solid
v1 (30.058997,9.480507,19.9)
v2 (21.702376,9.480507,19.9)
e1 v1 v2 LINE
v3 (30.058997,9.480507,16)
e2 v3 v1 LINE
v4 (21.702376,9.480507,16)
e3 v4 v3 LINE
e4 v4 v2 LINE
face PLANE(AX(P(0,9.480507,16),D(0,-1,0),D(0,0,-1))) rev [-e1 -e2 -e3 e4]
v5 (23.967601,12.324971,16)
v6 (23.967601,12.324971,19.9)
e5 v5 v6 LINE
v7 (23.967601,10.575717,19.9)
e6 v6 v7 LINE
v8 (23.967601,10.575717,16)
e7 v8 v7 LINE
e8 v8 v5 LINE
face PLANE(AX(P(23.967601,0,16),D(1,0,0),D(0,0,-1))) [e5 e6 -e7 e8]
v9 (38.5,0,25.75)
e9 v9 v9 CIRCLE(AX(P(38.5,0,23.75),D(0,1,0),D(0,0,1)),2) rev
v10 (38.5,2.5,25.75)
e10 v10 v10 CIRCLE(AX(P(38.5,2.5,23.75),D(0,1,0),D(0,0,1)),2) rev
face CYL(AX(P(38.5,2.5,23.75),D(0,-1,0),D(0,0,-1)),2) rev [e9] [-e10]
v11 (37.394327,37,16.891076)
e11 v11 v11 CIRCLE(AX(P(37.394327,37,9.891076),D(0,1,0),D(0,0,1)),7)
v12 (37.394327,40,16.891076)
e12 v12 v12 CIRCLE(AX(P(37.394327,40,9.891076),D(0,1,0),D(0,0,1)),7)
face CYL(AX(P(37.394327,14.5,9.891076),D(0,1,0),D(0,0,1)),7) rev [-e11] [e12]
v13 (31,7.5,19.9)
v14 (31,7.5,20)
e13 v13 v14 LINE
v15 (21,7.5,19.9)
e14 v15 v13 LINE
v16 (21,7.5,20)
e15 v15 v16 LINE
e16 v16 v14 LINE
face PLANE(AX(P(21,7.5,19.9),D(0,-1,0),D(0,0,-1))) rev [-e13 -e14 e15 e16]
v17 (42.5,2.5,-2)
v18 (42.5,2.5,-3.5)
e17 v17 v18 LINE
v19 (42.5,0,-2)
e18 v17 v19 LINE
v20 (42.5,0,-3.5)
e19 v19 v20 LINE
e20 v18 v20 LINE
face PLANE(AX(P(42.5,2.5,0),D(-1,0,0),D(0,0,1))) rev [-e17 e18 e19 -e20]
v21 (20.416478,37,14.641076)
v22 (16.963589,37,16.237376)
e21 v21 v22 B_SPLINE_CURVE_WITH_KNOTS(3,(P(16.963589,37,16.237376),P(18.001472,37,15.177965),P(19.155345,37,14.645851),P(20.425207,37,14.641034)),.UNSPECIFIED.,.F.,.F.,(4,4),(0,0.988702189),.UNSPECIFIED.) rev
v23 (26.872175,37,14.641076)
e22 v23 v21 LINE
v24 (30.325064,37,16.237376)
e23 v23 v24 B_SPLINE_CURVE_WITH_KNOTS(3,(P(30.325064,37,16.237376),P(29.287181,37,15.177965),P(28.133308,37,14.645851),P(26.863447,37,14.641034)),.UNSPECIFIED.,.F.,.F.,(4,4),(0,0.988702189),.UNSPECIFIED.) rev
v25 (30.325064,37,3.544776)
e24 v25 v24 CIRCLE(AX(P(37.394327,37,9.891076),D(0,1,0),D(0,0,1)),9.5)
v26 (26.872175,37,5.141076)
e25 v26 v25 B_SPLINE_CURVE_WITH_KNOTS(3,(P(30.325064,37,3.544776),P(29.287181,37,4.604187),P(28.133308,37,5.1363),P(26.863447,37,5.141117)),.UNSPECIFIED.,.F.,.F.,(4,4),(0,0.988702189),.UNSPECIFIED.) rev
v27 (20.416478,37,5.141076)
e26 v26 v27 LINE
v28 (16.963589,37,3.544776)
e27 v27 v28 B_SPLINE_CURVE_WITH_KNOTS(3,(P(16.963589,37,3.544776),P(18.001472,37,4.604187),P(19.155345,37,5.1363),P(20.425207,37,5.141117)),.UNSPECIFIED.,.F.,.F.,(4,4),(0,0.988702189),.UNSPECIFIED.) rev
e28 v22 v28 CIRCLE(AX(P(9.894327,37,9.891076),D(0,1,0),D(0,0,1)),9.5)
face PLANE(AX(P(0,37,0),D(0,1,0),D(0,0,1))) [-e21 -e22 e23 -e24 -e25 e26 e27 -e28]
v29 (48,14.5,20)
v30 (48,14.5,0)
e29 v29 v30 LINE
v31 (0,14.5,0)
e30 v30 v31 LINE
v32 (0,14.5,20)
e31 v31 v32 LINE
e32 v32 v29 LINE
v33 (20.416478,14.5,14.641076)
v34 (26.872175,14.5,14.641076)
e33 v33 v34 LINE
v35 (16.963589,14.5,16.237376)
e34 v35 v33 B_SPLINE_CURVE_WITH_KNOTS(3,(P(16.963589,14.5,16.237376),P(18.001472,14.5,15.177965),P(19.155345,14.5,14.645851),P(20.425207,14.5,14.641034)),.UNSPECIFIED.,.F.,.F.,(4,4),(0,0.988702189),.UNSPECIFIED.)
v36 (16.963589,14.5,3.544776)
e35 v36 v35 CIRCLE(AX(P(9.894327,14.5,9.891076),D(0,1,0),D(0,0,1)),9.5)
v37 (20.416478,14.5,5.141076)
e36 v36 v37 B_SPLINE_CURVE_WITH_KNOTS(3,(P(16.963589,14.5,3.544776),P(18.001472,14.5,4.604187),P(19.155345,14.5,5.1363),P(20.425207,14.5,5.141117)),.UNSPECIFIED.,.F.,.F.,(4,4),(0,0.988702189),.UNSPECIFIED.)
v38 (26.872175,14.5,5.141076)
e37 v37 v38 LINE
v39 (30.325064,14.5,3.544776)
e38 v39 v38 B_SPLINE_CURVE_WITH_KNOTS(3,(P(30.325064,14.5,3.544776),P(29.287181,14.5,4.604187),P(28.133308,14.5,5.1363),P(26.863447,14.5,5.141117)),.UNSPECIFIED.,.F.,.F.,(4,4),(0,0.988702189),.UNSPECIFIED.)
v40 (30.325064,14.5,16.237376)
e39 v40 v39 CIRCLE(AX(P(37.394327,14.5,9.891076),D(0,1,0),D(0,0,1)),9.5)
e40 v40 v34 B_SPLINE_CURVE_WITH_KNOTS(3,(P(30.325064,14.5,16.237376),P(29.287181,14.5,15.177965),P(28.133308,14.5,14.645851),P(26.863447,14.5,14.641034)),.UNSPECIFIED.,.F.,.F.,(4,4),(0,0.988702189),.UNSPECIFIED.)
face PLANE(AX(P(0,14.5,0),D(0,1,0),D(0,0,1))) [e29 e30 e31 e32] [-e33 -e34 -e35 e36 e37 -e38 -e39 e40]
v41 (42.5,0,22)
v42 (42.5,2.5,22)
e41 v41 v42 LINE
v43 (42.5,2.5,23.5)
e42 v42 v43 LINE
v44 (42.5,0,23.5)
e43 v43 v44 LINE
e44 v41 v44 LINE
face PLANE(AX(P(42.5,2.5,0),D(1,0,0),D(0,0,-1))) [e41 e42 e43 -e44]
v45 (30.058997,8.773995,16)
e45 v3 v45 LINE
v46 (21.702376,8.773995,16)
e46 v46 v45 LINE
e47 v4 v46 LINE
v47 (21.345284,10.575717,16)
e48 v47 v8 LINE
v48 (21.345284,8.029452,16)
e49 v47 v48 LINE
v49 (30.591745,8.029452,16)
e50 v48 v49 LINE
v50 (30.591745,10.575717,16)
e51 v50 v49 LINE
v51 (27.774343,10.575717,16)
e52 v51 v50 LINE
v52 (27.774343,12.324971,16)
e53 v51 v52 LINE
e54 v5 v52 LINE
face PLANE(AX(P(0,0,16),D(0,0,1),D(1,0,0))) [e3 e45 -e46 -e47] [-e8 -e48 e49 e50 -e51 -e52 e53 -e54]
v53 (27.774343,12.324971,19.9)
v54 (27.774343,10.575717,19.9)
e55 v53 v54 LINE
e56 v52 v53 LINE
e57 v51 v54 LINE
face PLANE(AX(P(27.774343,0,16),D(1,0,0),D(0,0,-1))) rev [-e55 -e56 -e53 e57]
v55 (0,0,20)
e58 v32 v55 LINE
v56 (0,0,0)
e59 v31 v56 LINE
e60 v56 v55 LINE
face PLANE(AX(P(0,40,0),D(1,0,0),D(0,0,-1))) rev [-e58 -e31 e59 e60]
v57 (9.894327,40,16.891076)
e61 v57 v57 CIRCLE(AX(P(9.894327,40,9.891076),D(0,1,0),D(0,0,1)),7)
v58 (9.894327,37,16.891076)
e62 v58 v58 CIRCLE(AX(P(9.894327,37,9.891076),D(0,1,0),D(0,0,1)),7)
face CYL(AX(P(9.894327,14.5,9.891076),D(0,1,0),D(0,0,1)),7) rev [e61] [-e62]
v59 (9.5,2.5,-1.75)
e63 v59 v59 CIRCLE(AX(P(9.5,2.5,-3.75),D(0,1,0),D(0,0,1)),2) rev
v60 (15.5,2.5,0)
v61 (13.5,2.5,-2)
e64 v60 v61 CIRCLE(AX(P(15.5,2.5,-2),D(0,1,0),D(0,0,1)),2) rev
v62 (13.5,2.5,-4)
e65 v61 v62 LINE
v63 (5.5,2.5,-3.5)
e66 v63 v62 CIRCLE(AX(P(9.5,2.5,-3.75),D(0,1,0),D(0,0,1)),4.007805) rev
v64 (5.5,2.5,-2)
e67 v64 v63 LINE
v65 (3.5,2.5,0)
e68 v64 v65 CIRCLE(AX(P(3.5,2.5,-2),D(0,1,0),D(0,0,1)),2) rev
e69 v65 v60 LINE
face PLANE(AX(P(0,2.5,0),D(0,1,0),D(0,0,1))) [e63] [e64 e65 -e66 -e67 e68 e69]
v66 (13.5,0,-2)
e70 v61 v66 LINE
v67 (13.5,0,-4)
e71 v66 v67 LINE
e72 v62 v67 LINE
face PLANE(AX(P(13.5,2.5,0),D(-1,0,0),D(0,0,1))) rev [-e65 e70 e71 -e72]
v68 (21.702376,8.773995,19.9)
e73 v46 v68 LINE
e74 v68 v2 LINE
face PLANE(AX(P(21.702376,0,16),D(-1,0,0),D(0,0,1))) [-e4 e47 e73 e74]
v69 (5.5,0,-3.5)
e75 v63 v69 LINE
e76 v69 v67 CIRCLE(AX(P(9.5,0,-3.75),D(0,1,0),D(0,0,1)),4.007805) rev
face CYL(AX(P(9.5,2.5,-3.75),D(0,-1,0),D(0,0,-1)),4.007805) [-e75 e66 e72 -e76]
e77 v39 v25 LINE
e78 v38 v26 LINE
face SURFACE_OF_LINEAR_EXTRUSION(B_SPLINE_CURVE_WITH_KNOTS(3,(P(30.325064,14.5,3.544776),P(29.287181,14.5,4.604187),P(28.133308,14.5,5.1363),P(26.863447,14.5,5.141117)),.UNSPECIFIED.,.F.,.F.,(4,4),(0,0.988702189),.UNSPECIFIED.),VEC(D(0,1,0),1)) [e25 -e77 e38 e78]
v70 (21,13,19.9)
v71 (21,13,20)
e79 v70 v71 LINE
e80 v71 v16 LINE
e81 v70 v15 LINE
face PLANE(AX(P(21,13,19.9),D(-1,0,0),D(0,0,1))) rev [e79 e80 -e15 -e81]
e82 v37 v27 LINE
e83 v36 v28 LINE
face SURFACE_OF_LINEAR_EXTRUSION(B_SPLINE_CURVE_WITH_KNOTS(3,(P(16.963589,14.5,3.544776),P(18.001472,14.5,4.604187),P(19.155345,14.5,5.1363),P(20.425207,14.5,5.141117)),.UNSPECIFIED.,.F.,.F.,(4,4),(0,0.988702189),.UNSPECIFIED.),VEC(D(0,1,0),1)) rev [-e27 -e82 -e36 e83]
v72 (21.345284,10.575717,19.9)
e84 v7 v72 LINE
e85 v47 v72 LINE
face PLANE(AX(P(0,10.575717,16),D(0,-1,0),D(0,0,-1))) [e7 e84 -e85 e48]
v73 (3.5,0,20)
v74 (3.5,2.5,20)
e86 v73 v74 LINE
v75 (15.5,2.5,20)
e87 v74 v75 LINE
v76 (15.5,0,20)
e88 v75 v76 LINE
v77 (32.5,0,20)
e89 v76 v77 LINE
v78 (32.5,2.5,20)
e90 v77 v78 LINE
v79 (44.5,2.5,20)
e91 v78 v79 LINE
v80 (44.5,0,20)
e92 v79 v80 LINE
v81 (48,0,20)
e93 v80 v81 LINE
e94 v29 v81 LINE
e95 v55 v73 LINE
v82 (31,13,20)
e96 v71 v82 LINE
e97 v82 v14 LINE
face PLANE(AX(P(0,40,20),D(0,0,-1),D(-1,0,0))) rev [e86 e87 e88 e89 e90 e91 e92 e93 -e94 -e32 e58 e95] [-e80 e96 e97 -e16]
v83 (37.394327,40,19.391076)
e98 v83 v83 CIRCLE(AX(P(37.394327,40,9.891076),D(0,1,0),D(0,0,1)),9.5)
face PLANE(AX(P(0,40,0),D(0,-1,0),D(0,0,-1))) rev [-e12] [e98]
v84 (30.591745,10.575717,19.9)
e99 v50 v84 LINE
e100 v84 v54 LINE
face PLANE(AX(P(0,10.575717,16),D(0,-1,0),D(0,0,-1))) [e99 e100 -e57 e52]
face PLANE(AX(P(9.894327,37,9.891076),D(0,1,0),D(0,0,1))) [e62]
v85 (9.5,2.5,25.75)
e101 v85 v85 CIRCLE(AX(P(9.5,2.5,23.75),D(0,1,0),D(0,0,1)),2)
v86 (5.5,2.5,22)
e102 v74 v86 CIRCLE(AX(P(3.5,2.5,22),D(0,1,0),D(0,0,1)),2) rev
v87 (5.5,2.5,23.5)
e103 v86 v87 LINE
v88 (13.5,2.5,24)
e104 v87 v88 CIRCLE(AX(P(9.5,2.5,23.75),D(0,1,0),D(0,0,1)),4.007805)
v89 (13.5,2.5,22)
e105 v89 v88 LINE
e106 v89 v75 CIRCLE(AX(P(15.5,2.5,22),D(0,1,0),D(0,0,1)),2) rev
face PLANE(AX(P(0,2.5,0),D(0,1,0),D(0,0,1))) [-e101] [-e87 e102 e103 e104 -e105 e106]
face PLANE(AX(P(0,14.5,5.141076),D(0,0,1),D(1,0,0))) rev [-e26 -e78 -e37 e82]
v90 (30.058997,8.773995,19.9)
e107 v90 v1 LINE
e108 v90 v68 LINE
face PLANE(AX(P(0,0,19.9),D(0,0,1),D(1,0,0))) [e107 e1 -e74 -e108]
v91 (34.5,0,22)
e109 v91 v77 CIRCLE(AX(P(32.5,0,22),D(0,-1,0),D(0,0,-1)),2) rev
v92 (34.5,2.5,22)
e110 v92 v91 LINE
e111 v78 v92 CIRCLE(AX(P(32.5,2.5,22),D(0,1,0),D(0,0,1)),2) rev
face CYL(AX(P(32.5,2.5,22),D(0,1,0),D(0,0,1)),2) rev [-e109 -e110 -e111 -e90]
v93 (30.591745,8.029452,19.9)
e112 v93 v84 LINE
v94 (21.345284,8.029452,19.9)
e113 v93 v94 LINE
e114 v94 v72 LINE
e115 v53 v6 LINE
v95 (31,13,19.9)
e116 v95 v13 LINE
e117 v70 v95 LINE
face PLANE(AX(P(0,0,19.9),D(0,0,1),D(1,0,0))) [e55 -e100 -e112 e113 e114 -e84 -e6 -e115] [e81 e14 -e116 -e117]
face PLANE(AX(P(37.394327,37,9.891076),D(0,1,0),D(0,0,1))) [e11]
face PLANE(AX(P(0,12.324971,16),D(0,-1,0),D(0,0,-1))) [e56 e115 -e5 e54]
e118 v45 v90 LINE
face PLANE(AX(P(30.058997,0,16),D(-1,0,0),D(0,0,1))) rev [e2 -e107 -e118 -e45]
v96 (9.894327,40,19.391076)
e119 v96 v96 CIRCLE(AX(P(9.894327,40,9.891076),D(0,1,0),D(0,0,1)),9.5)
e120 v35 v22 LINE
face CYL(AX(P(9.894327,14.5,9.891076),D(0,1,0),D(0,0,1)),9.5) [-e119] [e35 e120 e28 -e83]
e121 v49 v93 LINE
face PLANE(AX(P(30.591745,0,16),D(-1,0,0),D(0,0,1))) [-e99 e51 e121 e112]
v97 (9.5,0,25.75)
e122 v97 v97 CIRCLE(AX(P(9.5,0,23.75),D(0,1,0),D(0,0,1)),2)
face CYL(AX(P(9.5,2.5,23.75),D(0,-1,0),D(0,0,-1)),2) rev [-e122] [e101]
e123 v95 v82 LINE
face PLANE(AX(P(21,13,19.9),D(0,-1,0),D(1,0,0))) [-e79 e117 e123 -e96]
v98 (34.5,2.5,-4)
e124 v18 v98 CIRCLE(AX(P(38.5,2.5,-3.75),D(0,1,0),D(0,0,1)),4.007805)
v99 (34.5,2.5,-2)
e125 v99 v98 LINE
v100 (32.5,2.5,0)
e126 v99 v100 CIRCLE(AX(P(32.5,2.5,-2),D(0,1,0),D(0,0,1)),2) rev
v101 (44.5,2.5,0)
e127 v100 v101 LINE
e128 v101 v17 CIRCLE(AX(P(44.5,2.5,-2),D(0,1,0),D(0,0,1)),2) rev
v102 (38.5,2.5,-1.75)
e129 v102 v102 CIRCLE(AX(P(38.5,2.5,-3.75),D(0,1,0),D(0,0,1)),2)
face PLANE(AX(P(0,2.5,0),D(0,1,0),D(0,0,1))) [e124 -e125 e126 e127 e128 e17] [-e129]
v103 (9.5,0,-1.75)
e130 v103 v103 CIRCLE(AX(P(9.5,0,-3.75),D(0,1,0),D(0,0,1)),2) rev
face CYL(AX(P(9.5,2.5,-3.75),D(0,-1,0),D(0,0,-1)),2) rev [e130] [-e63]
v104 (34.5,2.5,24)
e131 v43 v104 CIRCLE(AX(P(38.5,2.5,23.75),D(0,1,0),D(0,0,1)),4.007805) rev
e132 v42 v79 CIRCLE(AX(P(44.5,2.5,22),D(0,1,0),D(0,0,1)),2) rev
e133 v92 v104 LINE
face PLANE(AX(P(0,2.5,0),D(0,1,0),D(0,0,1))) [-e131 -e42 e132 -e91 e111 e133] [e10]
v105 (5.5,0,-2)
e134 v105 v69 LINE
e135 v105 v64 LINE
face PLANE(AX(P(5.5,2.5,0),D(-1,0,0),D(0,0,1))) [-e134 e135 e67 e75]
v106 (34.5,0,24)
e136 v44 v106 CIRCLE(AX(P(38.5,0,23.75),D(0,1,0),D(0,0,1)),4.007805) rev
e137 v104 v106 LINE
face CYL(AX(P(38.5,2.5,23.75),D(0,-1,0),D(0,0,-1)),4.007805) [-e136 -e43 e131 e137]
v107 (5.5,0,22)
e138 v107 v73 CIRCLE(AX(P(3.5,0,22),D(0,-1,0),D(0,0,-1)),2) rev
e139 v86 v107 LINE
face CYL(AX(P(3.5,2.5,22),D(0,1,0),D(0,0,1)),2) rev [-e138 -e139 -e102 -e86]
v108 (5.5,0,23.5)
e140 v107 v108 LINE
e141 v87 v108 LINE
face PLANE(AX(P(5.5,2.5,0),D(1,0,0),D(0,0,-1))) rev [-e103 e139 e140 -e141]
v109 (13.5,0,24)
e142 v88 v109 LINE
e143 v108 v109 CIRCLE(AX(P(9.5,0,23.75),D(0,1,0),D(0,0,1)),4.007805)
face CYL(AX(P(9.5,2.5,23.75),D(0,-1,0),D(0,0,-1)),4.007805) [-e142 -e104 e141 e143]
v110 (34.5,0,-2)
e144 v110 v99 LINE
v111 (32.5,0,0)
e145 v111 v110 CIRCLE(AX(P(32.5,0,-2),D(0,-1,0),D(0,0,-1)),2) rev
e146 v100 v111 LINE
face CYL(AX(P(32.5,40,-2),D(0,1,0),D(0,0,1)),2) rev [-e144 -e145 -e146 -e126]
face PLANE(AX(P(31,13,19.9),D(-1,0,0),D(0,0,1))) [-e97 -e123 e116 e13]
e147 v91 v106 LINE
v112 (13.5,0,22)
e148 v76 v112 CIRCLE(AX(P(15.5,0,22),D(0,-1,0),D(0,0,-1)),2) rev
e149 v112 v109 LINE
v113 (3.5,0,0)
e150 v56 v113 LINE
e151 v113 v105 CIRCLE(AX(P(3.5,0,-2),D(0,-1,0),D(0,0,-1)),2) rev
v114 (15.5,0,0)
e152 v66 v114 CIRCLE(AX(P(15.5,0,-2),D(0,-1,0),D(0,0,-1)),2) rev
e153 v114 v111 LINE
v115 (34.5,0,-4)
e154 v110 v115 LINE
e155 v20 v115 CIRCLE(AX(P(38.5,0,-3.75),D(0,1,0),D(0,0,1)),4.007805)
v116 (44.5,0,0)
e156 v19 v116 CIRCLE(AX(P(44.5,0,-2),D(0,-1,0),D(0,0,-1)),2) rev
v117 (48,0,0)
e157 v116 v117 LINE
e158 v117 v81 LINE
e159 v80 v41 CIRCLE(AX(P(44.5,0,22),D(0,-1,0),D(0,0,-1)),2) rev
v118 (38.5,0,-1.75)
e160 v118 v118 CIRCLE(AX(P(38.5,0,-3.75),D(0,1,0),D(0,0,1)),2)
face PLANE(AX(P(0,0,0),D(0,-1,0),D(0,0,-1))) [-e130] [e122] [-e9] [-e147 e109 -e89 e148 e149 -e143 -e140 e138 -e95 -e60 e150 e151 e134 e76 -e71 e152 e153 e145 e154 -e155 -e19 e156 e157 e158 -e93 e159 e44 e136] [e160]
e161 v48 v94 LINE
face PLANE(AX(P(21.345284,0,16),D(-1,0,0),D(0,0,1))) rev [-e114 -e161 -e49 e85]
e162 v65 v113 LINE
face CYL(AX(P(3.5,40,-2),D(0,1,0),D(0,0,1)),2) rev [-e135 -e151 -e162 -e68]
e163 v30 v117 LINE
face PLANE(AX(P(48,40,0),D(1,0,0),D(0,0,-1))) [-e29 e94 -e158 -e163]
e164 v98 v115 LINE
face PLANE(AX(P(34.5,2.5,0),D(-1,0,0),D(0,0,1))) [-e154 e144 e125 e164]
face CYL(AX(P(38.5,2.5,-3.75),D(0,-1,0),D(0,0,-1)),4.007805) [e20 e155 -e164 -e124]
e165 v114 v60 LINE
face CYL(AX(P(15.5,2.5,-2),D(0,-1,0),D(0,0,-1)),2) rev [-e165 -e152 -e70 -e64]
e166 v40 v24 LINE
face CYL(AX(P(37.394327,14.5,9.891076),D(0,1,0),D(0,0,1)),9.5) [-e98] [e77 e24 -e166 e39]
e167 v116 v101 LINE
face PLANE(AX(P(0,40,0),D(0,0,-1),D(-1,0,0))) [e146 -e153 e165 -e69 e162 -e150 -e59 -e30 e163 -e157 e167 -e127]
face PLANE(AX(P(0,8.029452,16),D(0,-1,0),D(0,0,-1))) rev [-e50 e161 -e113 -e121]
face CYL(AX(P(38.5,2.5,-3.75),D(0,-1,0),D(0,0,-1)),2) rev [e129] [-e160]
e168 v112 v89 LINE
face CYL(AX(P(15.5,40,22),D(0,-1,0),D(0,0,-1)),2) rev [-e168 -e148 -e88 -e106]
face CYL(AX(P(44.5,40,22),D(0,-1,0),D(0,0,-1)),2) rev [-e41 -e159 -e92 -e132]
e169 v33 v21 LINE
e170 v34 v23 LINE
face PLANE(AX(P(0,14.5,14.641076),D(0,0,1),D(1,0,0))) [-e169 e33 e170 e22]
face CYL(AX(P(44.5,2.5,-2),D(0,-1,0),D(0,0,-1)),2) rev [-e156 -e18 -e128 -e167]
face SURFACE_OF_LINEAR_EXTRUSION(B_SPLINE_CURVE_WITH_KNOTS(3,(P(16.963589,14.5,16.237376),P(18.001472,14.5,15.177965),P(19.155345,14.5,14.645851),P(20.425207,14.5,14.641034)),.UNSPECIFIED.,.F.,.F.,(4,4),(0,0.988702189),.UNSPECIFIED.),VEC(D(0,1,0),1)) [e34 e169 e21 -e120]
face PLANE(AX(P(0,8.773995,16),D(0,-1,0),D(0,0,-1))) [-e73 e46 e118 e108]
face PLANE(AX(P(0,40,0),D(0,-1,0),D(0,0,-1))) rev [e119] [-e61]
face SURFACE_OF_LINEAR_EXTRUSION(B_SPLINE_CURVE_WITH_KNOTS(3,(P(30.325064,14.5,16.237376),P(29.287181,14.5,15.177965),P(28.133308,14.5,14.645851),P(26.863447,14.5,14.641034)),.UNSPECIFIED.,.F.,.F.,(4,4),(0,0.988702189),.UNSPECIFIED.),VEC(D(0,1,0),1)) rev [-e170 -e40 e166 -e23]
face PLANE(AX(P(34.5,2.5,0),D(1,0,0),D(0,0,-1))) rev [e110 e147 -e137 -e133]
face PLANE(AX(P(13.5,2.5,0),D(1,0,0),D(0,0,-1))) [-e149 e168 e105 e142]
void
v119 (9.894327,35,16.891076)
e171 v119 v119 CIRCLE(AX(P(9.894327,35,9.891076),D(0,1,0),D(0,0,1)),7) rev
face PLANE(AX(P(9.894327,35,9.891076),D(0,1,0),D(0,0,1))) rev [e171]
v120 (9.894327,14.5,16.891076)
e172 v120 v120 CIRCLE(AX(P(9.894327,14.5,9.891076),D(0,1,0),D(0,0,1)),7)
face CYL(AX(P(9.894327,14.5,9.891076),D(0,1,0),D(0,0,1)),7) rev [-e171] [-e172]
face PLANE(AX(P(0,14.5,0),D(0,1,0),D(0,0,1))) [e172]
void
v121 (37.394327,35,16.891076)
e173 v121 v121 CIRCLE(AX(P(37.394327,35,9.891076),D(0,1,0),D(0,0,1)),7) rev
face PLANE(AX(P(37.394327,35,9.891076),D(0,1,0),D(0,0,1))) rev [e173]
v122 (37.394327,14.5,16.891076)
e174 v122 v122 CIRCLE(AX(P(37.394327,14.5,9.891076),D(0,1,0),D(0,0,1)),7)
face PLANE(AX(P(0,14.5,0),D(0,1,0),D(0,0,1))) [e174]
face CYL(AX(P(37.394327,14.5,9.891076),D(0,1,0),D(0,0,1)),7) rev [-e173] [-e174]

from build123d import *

# Parameters (mm, degrees)
ESQUISSE1_W                 = 48
ESQUISSE1_H                 = 20
BOSS_EXTRU_2_DEPTH          = 40
ESQUISSE1_3_R               = 2
BOSS_EXTRU_4_DEPTH          = 2.5
CONG_1_R                    = 2
ENL_V_START                 = -25.5
ENL_V_MAT_EXTRU_2_OUTLINE_W = 48
ENL_V_MAT_EXTRU_2_OUTLINE_H = 20
ENL_V_MAT_EXTRU_2_DEPTH     = 25.5
ENL_V_START_2               = -3
ENL_V_MAT_EXTRU_3_DEPTH     = 3
ESQUISSE3_5_R               = 7
ENL_V_MAT_EXTRU_4_DEPTH     = 25.5
ESQUISSE8_R                 = 7
BOSS_EXTRU_5_DEPTH          = 2
ESQUISSE9_W                 = 3.806741441
ESQUISSE9_H                 = 1.749254543
ENL_V_MAT_EXTRU_5_DEPTH     = 4
ESQUISSE9_3_W               = 9.246461273
ESQUISSE9_3_H               = 2.546264857
ESQUISSE9_3_W_2             = 8.356621676
ESQUISSE9_3_H_2             = 0.706512752
ENL_V_MAT_EXTRU_6_DEPTH     = 4
ESQUISSE9_5_W               = 10
ESQUISSE9_5_H               = 5.5
ENL_V_MAT_EXTRU_7_DEPTH     = 0.1


# Read off the part's stored shape, not the designer's step: Enlèv. mat.-Extru.2, Enlèv. mat.-Extru.3
with BuildPart() as part:
    # Esquisse1 → Boss.-Extru.2 (new body)
    with BuildSketch(Plane(origin=(0, 0, 0), x_dir=(1, 0, 0), z_dir=(0, 1, 0))):
        with Locations((24, -10)):
            Rectangle(ESQUISSE1_W, ESQUISSE1_H)
    extrude(amount=BOSS_EXTRU_2_DEPTH)

    # Esquisse1<3> → Boss.-Extru.4 (add)
    # profile 1 of 4: a face of its own
    with BuildSketch(Plane(origin=(0, 0, 0), x_dir=(1, 0, 0), z_dir=(0, 1, 0))):
        with BuildLine():
            Line((13.5, -20), (5.5, -20))
            Line((5.5, -20), (5.5, -23.5))
            ThreePointArc((5.5, -23.5), (9.25, -27.75), (13.5, -24))
            Line((13.5, -24), (13.5, -20))
        make_face()
        with Locations(Location((9.5, -23.75, 0), (0, 0, 270))):
            Circle(ESQUISSE1_3_R, mode=Mode.SUBTRACT)
    # profile 2 of 4: a face of its own
    with BuildSketch(Plane(origin=(0, 0, 0), x_dir=(1, 0, 0), z_dir=(0, 1, 0))):
        with BuildLine():
            Line((42.5, -20), (34.5, -20))
            Line((34.5, -20), (34.5, -24))
            ThreePointArc((34.5, -24), (38.75, -27.75), (42.5, -23.5))
            Line((42.5, -23.5), (42.5, -20))
        make_face()
        with Locations(Location((38.5, -23.75, 0), (0, 0, 270))):
            Circle(ESQUISSE1_3_R, mode=Mode.SUBTRACT)
    # profile 3 of 4: a face of its own
    with BuildSketch(Plane(origin=(0, 0, 0), x_dir=(1, 0, 0), z_dir=(0, 1, 0))):
        with BuildLine():
            Line((5.5, 3.5), (5.5, 0))
            Line((5.5, 0), (13.5, 0))
            Line((13.5, 0), (13.5, 4))
            ThreePointArc((13.5, 4), (9.25, 7.75), (5.5, 3.5))
        make_face()
        with Locations(Location((9.5, 3.75, 0), (0, 0, 270))):
            Circle(ESQUISSE1_3_R, mode=Mode.SUBTRACT)
    # profile 4 of 4: a face of its own
    with BuildSketch(Plane(origin=(0, 0, 0), x_dir=(1, 0, 0), z_dir=(0, 1, 0))):
        with BuildLine():
            Line((34.5, 4), (34.5, 0))
            Line((34.5, 0), (42.5, 0))
            Line((42.5, 0), (42.5, 3.5))
            ThreePointArc((42.5, 3.5), (38.75, 7.75), (34.5, 4))
        make_face()
        with Locations(Location((38.5, 3.75, 0), (0, 0, 270))):
            Circle(ESQUISSE1_3_R, mode=Mode.SUBTRACT)
    extrude(amount=BOSS_EXTRU_4_DEPTH)

    # Congé1
    cong_1_edges = [part.edges().sort_by_distance(p)[0] for p in [
        (42.5, 1.25, 0),
        (34.5, 1.25, 0),
        (13.5, 1.25, 0),
        (5.5, 1.25, 0),
        (34.5, 1.25, 20),
        (42.5, 1.25, 20),
        (13.5, 1.25, 20),
        (5.5, 1.25, 20),
    ]]
    fillet(cong_1_edges, radius=CONG_1_R)

    # Enlèv. mat.-Extru.2 outline → Enlèv. mat.-Extru.2 (cut)
    with BuildSketch(Plane(origin=(0, 40, 0), x_dir=(1, 0, 0), z_dir=(0, 1, 0)).offset(ENL_V_START)):
        with Locations((24, -10)):
            Rectangle(ENL_V_MAT_EXTRU_2_OUTLINE_W, ENL_V_MAT_EXTRU_2_OUTLINE_H)
        with BuildLine():
            add(Edge.make_bspline(
                [(16.963589169, -16.237376104), (17.999093762, -15.180393065), (19.150056624, -14.648292989), (20.416477791, -14.641075876)],
                knots=[0, 0, 0, 0, 0.986436325, 0.986436325, 0.986436325, 0.986436325], degree=3))
            ThreePointArc((16.963589169, -16.237376104), (0.394326585, -9.891075881), (16.963589169, -3.544775658))
            add(Edge.make_bspline(
                [(16.963589169, -3.544775658), (17.999093762, -4.601758697), (19.150056624, -5.133858773), (20.416477791, -5.141075886)],
                knots=[0, 0, 0, 0, 0.986436325, 0.986436325, 0.986436325, 0.986436325], degree=3))
            Line((20.416477791, -5.141075886), (26.872175379, -5.141075886))
            add(Edge.make_bspline(
                [(30.325064001, -3.544775658), (29.289559409, -4.601758697), (28.138596547, -5.133858773), (26.872175379, -5.141075886)],
                knots=[0, 0, 0, 0, 0.986436325, 0.986436325, 0.986436325, 0.986436325], degree=3))
            ThreePointArc((30.325064001, -3.544775658), (46.894326585, -9.891075881), (30.325064001, -16.237376104))
            add(Edge.make_bspline(
                [(30.325064001, -16.237376104), (29.289559409, -15.180393065), (28.138596547, -14.648292989), (26.872175379, -14.641075876)],
                knots=[0, 0, 0, 0, 0.986436325, 0.986436325, 0.986436325, 0.986436325], degree=3))
            Line((26.872175379, -14.641075876), (20.416477791, -14.641075876))
        make_face(mode=Mode.SUBTRACT)
    extrude(amount=ENL_V_MAT_EXTRU_2_DEPTH, mode=Mode.SUBTRACT)

    # Enlèv. mat.-Extru.3 outline → Enlèv. mat.-Extru.3 (cut)
    with BuildSketch(Plane(origin=(0, 40, 0), x_dir=(1, 0, 0), z_dir=(0, 1, 0)).offset(ENL_V_START_2)):
        with BuildLine():
            ThreePointArc((30.325064001, -16.237376104), (27.894326585, -9.891075881), (30.325064001, -3.544775658))
            add(Edge.make_bspline(
                [(30.325064001, -3.544775658), (29.289559409, -4.601758697), (28.138596547, -5.133858773), (26.872175379, -5.141075886)],
                knots=[0, 0, 0, 0, 0.986436325, 0.986436325, 0.986436325, 0.986436325], degree=3))
            Line((26.872175379, -5.141075886), (20.416477791, -5.141075886))
            add(Edge.make_bspline(
                [(16.963589169, -3.544775658), (17.999093762, -4.601758697), (19.150056624, -5.133858773), (20.416477791, -5.141075886)],
                knots=[0, 0, 0, 0, 0.986436325, 0.986436325, 0.986436325, 0.986436325], degree=3))
            ThreePointArc((16.963589169, -3.544775658), (19.394326585, -9.891075881), (16.963589169, -16.237376104))
            add(Edge.make_bspline(
                [(16.963589169, -16.237376104), (17.999093762, -15.180393065), (19.150056624, -14.648292989), (20.416477791, -14.641075876)],
                knots=[0, 0, 0, 0, 0.986436325, 0.986436325, 0.986436325, 0.986436325], degree=3))
            Line((20.416477791, -14.641075876), (26.872175379, -14.641075876))
            add(Edge.make_bspline(
                [(30.325064001, -16.237376104), (29.289559409, -15.180393065), (28.138596547, -14.648292989), (26.872175379, -14.641075876)],
                knots=[0, 0, 0, 0, 0.986436325, 0.986436325, 0.986436325, 0.986436325], degree=3))
        make_face()
    extrude(amount=ENL_V_MAT_EXTRU_3_DEPTH, mode=Mode.SUBTRACT)

    # Esquisse3<5> → Enlèv. mat.-Extru.4 (cut)
    with BuildSketch(Plane(origin=(0, 40, 0), x_dir=(1, 0, 0), z_dir=(0, 1, 0))):
        with Locations(Location((9.894326585, -9.891075881, 0), (0, 0, 270))):
            Circle(ESQUISSE3_5_R)
        with Locations(Location((37.394326585, -9.891075881, 0), (0, 0, 270))):
            Circle(ESQUISSE3_5_R)
    extrude(amount=-ENL_V_MAT_EXTRU_4_DEPTH, mode=Mode.SUBTRACT)

    # Esquisse8 → Boss.-Extru.5 (add)
    with BuildSketch(Plane(origin=(0, 37, 0), x_dir=(1, 0, 0), z_dir=(0, 1, 0))):
        with Locations(Location((9.894326585, -9.891075881, 0), (0, 0, 270))):
            Circle(ESQUISSE8_R)
        with Locations(Location((37.394326585, -9.891075881, 0), (0, 0, 270))):
            Circle(ESQUISSE8_R)
    extrude(amount=-BOSS_EXTRU_5_DEPTH)

    # Esquisse9 → Enlèv. mat.-Extru.5 (cut)
    with BuildSketch(Plane.XY.offset(20)):
        with Locations((25.870972193, 11.450343865)):
            Rectangle(ESQUISSE9_W, ESQUISSE9_H)
    extrude(amount=-ENL_V_MAT_EXTRU_5_DEPTH, mode=Mode.SUBTRACT)

    # Esquisse9<3> → Enlèv. mat.-Extru.6 (cut)
    with BuildSketch(Plane.XY.offset(20)):
        with Locations((25.968514368, 9.302584165)):
            Rectangle(ESQUISSE9_3_W, ESQUISSE9_3_H)
        with Locations((25.880686529, 9.127251066)):
            Rectangle(ESQUISSE9_3_W_2, ESQUISSE9_3_H_2, mode=Mode.SUBTRACT)
    extrude(amount=-ENL_V_MAT_EXTRU_6_DEPTH, mode=Mode.SUBTRACT)

    # Esquisse9<5> → Enlèv. mat.-Extru.7 (cut)
    with BuildSketch(Plane.XY.offset(20)):
        with Locations((26, 10.25)):
            Rectangle(ESQUISSE9_5_W, ESQUISSE9_5_H)
    extrude(amount=-ENL_V_MAT_EXTRU_7_DEPTH, mode=Mode.SUBTRACT)


solid = part.part
